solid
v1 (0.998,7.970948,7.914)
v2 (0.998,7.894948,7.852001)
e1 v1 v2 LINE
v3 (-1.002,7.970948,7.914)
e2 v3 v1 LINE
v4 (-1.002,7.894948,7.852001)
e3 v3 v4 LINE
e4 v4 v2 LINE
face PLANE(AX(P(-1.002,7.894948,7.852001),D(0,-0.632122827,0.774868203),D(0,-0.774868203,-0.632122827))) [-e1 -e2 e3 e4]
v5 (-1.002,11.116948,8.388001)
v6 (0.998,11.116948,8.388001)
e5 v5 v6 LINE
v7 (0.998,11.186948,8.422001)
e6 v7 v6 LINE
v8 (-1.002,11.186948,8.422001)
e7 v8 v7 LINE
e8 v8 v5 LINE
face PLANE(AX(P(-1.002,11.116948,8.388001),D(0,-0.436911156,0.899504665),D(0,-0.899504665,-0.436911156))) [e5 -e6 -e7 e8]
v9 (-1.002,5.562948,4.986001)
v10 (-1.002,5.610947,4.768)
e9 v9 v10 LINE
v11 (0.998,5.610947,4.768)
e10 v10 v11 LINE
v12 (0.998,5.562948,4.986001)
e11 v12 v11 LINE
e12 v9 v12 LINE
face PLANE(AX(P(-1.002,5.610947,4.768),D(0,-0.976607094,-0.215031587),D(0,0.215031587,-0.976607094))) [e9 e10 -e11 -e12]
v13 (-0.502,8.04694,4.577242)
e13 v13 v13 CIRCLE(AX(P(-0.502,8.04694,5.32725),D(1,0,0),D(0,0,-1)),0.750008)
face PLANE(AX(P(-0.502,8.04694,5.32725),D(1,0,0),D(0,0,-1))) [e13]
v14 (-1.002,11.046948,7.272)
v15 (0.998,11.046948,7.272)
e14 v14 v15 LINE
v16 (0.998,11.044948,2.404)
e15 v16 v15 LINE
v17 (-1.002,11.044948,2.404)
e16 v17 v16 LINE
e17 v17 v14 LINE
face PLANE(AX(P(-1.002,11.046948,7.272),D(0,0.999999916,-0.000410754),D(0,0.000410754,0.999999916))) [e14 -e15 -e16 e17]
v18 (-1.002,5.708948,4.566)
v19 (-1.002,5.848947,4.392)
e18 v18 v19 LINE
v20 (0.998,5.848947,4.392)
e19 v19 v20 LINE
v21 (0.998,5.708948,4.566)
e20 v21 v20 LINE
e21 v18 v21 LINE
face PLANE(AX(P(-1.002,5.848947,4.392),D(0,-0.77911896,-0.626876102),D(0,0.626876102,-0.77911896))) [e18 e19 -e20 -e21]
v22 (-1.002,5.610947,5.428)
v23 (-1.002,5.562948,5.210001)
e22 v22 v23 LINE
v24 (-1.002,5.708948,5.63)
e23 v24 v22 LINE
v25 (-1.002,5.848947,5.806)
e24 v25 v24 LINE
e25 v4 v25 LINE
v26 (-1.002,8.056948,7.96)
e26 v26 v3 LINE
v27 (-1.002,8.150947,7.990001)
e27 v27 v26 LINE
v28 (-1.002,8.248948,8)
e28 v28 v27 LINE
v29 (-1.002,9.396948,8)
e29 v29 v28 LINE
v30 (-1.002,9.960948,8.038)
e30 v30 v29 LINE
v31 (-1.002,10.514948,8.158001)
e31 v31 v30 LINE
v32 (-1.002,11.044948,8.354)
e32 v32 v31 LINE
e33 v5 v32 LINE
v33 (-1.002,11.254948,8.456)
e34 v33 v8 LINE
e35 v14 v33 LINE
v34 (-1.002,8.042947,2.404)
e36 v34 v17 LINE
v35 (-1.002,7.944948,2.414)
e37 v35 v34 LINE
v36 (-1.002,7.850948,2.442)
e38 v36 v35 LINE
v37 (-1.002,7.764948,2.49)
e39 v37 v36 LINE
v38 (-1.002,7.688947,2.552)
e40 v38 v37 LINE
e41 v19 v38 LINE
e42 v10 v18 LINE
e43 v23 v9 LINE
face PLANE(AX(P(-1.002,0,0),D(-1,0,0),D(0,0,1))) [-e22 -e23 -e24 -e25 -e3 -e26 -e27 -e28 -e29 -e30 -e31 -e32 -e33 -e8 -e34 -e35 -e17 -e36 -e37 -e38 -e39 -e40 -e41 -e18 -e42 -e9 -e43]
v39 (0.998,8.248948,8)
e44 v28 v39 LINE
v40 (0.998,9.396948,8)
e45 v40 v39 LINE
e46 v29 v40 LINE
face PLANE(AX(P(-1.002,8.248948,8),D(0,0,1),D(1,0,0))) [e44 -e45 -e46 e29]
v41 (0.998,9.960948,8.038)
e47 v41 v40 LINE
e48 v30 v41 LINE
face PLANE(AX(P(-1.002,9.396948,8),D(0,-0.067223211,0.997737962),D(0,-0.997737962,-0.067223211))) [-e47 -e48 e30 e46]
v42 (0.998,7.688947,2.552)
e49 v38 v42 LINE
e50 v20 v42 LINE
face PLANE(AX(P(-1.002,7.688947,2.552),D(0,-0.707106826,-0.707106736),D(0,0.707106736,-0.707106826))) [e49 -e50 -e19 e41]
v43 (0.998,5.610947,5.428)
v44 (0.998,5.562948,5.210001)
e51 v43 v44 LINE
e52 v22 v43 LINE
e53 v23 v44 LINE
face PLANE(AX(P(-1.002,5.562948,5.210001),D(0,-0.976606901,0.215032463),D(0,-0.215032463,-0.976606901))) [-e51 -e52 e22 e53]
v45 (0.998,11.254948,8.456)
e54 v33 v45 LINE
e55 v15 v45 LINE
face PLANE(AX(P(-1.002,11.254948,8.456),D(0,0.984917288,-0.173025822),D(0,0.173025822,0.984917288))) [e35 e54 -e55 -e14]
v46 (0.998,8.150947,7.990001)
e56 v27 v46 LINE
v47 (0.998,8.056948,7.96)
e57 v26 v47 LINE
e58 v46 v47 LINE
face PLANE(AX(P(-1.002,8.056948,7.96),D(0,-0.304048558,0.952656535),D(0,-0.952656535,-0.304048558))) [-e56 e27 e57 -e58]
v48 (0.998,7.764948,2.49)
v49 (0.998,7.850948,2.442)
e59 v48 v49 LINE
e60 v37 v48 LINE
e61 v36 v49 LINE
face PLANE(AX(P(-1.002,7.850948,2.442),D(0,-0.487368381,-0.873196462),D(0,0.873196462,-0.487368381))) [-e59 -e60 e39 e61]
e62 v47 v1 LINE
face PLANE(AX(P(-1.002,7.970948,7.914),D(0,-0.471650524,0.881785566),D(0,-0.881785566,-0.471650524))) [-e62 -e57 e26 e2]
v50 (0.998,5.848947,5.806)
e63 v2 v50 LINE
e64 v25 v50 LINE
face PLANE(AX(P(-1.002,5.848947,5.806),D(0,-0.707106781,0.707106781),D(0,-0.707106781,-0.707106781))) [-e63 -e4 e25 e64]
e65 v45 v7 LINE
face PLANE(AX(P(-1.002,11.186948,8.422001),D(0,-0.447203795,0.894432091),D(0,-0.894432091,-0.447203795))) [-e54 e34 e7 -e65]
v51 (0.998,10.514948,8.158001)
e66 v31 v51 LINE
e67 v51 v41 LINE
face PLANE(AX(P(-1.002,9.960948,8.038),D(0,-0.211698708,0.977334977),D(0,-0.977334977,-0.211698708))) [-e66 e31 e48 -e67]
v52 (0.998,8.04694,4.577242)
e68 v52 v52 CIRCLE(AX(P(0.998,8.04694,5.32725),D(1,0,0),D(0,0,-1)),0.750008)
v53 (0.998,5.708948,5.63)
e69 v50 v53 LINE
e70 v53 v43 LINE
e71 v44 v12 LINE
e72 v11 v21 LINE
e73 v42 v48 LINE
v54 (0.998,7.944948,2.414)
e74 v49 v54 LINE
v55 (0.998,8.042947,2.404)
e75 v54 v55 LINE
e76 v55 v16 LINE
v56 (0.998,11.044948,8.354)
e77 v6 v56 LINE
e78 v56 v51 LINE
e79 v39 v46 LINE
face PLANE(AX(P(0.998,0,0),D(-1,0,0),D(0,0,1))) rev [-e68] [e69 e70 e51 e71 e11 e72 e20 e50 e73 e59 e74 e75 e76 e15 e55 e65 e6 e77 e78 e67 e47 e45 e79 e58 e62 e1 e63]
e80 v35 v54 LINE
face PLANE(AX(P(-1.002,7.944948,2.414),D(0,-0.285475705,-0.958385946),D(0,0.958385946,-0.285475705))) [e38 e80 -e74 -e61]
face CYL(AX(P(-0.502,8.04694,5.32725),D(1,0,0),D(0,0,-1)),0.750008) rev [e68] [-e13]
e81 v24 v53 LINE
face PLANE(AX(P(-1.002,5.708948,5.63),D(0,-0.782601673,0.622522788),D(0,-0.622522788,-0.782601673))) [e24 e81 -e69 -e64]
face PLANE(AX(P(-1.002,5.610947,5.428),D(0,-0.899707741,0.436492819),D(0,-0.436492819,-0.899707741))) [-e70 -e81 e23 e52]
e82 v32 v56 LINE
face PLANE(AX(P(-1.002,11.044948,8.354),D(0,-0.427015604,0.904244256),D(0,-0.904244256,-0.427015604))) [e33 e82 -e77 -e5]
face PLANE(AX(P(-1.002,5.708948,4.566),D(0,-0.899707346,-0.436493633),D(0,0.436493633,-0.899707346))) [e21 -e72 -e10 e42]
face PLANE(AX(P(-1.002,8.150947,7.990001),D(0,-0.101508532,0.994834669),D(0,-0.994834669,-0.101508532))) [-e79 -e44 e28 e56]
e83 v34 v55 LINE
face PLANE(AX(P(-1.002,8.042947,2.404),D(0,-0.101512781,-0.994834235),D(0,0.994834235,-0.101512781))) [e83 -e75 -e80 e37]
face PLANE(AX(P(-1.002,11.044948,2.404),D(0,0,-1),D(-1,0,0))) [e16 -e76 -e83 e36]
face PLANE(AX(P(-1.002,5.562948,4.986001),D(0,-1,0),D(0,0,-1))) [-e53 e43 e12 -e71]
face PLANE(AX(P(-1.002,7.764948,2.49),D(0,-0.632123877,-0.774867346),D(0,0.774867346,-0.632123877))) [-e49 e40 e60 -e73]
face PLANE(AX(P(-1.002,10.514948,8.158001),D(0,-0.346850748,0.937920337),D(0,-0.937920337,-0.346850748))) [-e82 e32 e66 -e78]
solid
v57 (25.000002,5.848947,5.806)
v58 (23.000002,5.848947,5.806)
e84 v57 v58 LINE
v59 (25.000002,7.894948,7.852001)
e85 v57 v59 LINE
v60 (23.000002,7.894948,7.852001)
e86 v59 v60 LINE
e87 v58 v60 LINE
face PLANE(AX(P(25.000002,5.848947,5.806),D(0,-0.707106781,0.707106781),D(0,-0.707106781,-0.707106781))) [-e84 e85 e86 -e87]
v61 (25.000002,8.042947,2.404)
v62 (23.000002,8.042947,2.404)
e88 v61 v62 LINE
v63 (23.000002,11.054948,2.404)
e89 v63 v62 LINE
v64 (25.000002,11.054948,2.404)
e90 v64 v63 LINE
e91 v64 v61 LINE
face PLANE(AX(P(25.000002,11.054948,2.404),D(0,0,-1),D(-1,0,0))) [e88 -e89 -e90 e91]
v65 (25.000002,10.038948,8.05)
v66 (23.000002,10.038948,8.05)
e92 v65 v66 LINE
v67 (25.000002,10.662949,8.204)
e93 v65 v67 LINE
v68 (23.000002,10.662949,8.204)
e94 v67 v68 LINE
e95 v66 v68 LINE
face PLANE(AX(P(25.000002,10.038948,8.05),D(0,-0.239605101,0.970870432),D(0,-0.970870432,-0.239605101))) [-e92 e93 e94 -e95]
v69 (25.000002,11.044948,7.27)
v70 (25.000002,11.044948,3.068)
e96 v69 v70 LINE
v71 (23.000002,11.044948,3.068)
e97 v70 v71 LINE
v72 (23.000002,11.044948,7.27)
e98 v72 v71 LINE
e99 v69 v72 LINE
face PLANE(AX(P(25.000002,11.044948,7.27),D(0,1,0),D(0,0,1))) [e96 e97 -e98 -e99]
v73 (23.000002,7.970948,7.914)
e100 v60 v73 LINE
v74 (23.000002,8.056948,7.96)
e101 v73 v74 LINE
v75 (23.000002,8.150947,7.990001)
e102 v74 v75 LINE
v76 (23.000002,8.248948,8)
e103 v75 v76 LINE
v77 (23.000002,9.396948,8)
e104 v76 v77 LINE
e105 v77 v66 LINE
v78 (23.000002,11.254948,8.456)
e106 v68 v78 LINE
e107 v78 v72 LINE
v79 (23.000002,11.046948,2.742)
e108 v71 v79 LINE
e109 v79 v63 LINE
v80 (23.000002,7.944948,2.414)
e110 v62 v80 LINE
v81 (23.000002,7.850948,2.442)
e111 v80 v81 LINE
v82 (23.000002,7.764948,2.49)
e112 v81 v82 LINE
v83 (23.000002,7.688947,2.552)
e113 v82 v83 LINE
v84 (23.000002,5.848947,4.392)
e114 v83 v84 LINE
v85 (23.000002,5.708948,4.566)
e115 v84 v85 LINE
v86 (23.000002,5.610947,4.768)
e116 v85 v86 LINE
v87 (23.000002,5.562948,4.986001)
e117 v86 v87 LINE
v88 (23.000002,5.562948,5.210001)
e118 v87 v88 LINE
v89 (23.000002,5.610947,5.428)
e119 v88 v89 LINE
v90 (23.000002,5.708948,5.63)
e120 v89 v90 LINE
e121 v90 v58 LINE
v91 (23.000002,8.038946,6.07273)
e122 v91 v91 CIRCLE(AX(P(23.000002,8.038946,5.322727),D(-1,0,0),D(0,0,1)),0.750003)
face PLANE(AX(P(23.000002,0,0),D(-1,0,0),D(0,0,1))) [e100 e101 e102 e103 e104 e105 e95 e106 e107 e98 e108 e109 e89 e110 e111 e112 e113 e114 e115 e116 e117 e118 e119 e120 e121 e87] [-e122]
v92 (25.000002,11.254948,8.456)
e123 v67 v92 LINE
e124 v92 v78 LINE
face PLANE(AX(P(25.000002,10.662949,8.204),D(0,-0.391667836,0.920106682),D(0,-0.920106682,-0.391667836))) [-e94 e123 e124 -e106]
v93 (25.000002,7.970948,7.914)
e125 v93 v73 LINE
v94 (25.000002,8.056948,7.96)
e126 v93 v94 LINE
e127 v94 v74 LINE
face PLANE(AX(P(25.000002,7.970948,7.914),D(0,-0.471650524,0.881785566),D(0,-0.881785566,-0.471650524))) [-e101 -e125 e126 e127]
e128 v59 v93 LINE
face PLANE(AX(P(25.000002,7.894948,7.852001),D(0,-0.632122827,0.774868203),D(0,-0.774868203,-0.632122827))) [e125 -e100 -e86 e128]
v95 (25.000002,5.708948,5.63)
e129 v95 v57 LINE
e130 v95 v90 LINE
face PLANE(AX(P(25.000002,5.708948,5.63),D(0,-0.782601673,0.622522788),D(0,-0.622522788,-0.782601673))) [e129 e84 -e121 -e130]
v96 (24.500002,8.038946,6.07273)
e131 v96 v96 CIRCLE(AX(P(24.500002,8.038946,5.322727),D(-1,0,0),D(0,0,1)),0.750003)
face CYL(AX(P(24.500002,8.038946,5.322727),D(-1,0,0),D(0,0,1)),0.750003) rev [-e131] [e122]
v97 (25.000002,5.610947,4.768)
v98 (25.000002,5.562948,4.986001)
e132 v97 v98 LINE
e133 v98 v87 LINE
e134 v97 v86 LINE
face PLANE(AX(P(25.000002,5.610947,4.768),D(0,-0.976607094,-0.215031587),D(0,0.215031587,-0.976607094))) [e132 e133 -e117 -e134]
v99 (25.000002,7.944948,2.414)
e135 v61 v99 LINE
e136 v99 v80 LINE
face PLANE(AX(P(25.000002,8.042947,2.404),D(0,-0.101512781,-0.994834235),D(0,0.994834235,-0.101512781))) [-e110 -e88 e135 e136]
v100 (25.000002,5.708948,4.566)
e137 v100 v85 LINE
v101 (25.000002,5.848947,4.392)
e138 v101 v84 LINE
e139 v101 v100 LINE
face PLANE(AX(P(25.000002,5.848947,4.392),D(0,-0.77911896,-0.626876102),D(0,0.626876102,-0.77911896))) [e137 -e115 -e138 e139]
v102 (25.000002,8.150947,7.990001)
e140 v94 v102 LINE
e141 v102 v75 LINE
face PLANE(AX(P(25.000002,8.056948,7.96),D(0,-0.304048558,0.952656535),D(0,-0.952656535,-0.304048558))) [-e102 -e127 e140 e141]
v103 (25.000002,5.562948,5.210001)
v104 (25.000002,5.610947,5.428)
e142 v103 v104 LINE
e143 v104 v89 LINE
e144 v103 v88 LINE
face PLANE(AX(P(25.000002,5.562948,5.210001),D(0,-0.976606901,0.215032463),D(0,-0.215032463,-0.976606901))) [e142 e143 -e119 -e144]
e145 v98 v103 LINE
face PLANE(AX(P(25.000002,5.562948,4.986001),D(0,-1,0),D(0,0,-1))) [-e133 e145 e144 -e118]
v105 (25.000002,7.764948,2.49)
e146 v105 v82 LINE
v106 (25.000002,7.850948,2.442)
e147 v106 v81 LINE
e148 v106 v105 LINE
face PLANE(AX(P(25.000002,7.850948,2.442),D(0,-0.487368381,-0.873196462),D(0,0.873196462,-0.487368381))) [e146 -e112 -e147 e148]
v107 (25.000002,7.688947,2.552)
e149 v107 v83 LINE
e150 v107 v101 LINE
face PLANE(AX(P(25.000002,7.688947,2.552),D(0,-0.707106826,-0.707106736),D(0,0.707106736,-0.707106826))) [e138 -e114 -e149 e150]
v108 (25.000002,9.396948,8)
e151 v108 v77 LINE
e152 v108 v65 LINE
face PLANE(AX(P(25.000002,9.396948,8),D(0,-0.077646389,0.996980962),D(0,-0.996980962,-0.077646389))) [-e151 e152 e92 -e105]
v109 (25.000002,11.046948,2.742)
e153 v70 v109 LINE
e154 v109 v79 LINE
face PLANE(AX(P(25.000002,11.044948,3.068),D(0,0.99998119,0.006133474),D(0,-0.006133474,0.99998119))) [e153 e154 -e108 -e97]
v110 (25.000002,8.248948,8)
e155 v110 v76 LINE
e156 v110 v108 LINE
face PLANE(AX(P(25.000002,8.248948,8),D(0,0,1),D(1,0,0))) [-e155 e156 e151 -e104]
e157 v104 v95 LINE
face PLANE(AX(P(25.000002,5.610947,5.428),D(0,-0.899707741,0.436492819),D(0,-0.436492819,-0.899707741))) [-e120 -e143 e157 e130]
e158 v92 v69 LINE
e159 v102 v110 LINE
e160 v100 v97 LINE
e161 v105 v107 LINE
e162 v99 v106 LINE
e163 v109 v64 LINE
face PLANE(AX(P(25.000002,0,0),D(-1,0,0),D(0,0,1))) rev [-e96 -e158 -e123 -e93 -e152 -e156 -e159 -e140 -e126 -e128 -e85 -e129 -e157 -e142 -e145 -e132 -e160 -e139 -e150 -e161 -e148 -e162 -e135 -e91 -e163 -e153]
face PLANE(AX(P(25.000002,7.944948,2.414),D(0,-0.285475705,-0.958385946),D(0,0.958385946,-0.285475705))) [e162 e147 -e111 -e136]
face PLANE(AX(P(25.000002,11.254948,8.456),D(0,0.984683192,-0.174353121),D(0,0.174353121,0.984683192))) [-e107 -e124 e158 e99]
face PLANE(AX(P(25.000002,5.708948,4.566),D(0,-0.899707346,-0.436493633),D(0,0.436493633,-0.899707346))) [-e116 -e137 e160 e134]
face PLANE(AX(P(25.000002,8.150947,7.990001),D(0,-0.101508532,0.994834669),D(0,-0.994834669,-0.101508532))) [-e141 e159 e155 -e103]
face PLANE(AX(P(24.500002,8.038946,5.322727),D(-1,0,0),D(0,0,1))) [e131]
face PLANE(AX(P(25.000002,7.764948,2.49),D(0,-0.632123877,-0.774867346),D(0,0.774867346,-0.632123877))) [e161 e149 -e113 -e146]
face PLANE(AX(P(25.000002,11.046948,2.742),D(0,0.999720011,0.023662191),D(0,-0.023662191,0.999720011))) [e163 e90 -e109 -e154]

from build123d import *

# Parameters (mm, degrees)
EXTRUDE_1_DEPTH     = 2
SKETCH_7_R          = 0.750002586
CUT_EXTRUDE_1_DEPTH = 1.5
EXTRUDE_2_DEPTH     = 2
SKETCH_10_R         = 0.750007818
CUT_EXTRUDE_6_DEPTH = 1.5


# Read off the part's stored shape, not the designer's step: Поверхность-Импортированный1
with BuildPart() as part:
    # Эскиз1 → Бобышка-Вытянуть1 (new body)
    with BuildSketch(Plane.ZY.offset(-23.000001907)):
        Polygon((2.404000144, 8.042947389), (2.413999988, 7.94494804), (2.441999968, 7.85094779), (2.490000101, 7.764948066), (2.552000107, 7.688947488), (4.392000381, 5.848947447), (4.566000309, 5.708947778), (4.767999984, 5.610947497), (4.986000713, 5.562947597), (5.210000556, 5.562947597), (5.428000353, 5.610947497), (5.630000494, 5.708947778), (5.806000438, 5.848947447), (7.852001116, 7.894948125), (7.914000191, 7.970947772), (7.960000075, 8.056947961), (7.990000769, 8.15094728), (8.00000038, 8.248948492), (8.00000038, 9.39694792), (8.050000295, 10.038947687), (8.204000071, 10.662948713), (8.456000127, 11.254947633), (7.270000409, 11.044948362), (3.068000078, 11.044948362), (2.742000157, 11.046947911), (2.404000144, 11.054947972), align=None)
    extrude(amount=-EXTRUDE_1_DEPTH)

    # Эскиз7 → Вырез-Вытянуть1 (cut)
    with BuildSketch(Plane.ZY.offset(-23.000001907)):
        with Locations((5.322727094, 8.038945713)):
            Circle(SKETCH_7_R)
    extrude(amount=-CUT_EXTRUDE_1_DEPTH, mode=Mode.SUBTRACT)


with BuildPart() as body_2:
    # Эскиз8 → Бобышка-Вытянуть2 (new body)
    with BuildSketch(Plane(origin=(0.998000149, 0, 0), x_dir=(0, 0, -1), z_dir=(1, 0, 0))):
        Polygon((-2.404000144, 11.044948362), (-2.404000144, 8.042947389), (-2.413999988, 7.94494804), (-2.441999968, 7.85094779), (-2.490000101, 7.764948066), (-2.552000107, 7.688947488), (-4.392000381, 5.848947447), (-4.566000309, 5.708947778), (-4.767999984, 5.610947497), (-4.986000713, 5.562947597), (-5.210000556, 5.562947597), (-5.428000353, 5.610947497), (-5.630000494, 5.708947778), (-5.806000438, 5.848947447), (-7.852001116, 7.894948125), (-7.914000191, 7.970947772), (-7.960000075, 8.056947961), (-7.990000769, 8.15094728), (-8.00000038, 8.248948492), (-8.00000038, 9.39694792), (-8.038000204, 9.960947558), (-8.158001117, 10.514947586), (-8.353999816, 11.044948362), (-8.38800054, 11.116947979), (-8.422001265, 11.186948046), (-8.456000127, 11.254947633), (-7.272000425, 11.046947911), align=None)
    extrude(amount=-EXTRUDE_2_DEPTH)

    # Эскиз10 → Вырез-Вытянуть6 (cut)
    with BuildSketch(Plane(origin=(0.998000149, 0, 0), x_dir=(0, 0, -1), z_dir=(1, 0, 0))):
        with Locations((-5.327250078, 8.046939634)):
            Circle(SKETCH_10_R)
    extrude(amount=-CUT_EXTRUDE_6_DEPTH, mode=Mode.SUBTRACT)


solid = Compound([part.part, body_2.part])
